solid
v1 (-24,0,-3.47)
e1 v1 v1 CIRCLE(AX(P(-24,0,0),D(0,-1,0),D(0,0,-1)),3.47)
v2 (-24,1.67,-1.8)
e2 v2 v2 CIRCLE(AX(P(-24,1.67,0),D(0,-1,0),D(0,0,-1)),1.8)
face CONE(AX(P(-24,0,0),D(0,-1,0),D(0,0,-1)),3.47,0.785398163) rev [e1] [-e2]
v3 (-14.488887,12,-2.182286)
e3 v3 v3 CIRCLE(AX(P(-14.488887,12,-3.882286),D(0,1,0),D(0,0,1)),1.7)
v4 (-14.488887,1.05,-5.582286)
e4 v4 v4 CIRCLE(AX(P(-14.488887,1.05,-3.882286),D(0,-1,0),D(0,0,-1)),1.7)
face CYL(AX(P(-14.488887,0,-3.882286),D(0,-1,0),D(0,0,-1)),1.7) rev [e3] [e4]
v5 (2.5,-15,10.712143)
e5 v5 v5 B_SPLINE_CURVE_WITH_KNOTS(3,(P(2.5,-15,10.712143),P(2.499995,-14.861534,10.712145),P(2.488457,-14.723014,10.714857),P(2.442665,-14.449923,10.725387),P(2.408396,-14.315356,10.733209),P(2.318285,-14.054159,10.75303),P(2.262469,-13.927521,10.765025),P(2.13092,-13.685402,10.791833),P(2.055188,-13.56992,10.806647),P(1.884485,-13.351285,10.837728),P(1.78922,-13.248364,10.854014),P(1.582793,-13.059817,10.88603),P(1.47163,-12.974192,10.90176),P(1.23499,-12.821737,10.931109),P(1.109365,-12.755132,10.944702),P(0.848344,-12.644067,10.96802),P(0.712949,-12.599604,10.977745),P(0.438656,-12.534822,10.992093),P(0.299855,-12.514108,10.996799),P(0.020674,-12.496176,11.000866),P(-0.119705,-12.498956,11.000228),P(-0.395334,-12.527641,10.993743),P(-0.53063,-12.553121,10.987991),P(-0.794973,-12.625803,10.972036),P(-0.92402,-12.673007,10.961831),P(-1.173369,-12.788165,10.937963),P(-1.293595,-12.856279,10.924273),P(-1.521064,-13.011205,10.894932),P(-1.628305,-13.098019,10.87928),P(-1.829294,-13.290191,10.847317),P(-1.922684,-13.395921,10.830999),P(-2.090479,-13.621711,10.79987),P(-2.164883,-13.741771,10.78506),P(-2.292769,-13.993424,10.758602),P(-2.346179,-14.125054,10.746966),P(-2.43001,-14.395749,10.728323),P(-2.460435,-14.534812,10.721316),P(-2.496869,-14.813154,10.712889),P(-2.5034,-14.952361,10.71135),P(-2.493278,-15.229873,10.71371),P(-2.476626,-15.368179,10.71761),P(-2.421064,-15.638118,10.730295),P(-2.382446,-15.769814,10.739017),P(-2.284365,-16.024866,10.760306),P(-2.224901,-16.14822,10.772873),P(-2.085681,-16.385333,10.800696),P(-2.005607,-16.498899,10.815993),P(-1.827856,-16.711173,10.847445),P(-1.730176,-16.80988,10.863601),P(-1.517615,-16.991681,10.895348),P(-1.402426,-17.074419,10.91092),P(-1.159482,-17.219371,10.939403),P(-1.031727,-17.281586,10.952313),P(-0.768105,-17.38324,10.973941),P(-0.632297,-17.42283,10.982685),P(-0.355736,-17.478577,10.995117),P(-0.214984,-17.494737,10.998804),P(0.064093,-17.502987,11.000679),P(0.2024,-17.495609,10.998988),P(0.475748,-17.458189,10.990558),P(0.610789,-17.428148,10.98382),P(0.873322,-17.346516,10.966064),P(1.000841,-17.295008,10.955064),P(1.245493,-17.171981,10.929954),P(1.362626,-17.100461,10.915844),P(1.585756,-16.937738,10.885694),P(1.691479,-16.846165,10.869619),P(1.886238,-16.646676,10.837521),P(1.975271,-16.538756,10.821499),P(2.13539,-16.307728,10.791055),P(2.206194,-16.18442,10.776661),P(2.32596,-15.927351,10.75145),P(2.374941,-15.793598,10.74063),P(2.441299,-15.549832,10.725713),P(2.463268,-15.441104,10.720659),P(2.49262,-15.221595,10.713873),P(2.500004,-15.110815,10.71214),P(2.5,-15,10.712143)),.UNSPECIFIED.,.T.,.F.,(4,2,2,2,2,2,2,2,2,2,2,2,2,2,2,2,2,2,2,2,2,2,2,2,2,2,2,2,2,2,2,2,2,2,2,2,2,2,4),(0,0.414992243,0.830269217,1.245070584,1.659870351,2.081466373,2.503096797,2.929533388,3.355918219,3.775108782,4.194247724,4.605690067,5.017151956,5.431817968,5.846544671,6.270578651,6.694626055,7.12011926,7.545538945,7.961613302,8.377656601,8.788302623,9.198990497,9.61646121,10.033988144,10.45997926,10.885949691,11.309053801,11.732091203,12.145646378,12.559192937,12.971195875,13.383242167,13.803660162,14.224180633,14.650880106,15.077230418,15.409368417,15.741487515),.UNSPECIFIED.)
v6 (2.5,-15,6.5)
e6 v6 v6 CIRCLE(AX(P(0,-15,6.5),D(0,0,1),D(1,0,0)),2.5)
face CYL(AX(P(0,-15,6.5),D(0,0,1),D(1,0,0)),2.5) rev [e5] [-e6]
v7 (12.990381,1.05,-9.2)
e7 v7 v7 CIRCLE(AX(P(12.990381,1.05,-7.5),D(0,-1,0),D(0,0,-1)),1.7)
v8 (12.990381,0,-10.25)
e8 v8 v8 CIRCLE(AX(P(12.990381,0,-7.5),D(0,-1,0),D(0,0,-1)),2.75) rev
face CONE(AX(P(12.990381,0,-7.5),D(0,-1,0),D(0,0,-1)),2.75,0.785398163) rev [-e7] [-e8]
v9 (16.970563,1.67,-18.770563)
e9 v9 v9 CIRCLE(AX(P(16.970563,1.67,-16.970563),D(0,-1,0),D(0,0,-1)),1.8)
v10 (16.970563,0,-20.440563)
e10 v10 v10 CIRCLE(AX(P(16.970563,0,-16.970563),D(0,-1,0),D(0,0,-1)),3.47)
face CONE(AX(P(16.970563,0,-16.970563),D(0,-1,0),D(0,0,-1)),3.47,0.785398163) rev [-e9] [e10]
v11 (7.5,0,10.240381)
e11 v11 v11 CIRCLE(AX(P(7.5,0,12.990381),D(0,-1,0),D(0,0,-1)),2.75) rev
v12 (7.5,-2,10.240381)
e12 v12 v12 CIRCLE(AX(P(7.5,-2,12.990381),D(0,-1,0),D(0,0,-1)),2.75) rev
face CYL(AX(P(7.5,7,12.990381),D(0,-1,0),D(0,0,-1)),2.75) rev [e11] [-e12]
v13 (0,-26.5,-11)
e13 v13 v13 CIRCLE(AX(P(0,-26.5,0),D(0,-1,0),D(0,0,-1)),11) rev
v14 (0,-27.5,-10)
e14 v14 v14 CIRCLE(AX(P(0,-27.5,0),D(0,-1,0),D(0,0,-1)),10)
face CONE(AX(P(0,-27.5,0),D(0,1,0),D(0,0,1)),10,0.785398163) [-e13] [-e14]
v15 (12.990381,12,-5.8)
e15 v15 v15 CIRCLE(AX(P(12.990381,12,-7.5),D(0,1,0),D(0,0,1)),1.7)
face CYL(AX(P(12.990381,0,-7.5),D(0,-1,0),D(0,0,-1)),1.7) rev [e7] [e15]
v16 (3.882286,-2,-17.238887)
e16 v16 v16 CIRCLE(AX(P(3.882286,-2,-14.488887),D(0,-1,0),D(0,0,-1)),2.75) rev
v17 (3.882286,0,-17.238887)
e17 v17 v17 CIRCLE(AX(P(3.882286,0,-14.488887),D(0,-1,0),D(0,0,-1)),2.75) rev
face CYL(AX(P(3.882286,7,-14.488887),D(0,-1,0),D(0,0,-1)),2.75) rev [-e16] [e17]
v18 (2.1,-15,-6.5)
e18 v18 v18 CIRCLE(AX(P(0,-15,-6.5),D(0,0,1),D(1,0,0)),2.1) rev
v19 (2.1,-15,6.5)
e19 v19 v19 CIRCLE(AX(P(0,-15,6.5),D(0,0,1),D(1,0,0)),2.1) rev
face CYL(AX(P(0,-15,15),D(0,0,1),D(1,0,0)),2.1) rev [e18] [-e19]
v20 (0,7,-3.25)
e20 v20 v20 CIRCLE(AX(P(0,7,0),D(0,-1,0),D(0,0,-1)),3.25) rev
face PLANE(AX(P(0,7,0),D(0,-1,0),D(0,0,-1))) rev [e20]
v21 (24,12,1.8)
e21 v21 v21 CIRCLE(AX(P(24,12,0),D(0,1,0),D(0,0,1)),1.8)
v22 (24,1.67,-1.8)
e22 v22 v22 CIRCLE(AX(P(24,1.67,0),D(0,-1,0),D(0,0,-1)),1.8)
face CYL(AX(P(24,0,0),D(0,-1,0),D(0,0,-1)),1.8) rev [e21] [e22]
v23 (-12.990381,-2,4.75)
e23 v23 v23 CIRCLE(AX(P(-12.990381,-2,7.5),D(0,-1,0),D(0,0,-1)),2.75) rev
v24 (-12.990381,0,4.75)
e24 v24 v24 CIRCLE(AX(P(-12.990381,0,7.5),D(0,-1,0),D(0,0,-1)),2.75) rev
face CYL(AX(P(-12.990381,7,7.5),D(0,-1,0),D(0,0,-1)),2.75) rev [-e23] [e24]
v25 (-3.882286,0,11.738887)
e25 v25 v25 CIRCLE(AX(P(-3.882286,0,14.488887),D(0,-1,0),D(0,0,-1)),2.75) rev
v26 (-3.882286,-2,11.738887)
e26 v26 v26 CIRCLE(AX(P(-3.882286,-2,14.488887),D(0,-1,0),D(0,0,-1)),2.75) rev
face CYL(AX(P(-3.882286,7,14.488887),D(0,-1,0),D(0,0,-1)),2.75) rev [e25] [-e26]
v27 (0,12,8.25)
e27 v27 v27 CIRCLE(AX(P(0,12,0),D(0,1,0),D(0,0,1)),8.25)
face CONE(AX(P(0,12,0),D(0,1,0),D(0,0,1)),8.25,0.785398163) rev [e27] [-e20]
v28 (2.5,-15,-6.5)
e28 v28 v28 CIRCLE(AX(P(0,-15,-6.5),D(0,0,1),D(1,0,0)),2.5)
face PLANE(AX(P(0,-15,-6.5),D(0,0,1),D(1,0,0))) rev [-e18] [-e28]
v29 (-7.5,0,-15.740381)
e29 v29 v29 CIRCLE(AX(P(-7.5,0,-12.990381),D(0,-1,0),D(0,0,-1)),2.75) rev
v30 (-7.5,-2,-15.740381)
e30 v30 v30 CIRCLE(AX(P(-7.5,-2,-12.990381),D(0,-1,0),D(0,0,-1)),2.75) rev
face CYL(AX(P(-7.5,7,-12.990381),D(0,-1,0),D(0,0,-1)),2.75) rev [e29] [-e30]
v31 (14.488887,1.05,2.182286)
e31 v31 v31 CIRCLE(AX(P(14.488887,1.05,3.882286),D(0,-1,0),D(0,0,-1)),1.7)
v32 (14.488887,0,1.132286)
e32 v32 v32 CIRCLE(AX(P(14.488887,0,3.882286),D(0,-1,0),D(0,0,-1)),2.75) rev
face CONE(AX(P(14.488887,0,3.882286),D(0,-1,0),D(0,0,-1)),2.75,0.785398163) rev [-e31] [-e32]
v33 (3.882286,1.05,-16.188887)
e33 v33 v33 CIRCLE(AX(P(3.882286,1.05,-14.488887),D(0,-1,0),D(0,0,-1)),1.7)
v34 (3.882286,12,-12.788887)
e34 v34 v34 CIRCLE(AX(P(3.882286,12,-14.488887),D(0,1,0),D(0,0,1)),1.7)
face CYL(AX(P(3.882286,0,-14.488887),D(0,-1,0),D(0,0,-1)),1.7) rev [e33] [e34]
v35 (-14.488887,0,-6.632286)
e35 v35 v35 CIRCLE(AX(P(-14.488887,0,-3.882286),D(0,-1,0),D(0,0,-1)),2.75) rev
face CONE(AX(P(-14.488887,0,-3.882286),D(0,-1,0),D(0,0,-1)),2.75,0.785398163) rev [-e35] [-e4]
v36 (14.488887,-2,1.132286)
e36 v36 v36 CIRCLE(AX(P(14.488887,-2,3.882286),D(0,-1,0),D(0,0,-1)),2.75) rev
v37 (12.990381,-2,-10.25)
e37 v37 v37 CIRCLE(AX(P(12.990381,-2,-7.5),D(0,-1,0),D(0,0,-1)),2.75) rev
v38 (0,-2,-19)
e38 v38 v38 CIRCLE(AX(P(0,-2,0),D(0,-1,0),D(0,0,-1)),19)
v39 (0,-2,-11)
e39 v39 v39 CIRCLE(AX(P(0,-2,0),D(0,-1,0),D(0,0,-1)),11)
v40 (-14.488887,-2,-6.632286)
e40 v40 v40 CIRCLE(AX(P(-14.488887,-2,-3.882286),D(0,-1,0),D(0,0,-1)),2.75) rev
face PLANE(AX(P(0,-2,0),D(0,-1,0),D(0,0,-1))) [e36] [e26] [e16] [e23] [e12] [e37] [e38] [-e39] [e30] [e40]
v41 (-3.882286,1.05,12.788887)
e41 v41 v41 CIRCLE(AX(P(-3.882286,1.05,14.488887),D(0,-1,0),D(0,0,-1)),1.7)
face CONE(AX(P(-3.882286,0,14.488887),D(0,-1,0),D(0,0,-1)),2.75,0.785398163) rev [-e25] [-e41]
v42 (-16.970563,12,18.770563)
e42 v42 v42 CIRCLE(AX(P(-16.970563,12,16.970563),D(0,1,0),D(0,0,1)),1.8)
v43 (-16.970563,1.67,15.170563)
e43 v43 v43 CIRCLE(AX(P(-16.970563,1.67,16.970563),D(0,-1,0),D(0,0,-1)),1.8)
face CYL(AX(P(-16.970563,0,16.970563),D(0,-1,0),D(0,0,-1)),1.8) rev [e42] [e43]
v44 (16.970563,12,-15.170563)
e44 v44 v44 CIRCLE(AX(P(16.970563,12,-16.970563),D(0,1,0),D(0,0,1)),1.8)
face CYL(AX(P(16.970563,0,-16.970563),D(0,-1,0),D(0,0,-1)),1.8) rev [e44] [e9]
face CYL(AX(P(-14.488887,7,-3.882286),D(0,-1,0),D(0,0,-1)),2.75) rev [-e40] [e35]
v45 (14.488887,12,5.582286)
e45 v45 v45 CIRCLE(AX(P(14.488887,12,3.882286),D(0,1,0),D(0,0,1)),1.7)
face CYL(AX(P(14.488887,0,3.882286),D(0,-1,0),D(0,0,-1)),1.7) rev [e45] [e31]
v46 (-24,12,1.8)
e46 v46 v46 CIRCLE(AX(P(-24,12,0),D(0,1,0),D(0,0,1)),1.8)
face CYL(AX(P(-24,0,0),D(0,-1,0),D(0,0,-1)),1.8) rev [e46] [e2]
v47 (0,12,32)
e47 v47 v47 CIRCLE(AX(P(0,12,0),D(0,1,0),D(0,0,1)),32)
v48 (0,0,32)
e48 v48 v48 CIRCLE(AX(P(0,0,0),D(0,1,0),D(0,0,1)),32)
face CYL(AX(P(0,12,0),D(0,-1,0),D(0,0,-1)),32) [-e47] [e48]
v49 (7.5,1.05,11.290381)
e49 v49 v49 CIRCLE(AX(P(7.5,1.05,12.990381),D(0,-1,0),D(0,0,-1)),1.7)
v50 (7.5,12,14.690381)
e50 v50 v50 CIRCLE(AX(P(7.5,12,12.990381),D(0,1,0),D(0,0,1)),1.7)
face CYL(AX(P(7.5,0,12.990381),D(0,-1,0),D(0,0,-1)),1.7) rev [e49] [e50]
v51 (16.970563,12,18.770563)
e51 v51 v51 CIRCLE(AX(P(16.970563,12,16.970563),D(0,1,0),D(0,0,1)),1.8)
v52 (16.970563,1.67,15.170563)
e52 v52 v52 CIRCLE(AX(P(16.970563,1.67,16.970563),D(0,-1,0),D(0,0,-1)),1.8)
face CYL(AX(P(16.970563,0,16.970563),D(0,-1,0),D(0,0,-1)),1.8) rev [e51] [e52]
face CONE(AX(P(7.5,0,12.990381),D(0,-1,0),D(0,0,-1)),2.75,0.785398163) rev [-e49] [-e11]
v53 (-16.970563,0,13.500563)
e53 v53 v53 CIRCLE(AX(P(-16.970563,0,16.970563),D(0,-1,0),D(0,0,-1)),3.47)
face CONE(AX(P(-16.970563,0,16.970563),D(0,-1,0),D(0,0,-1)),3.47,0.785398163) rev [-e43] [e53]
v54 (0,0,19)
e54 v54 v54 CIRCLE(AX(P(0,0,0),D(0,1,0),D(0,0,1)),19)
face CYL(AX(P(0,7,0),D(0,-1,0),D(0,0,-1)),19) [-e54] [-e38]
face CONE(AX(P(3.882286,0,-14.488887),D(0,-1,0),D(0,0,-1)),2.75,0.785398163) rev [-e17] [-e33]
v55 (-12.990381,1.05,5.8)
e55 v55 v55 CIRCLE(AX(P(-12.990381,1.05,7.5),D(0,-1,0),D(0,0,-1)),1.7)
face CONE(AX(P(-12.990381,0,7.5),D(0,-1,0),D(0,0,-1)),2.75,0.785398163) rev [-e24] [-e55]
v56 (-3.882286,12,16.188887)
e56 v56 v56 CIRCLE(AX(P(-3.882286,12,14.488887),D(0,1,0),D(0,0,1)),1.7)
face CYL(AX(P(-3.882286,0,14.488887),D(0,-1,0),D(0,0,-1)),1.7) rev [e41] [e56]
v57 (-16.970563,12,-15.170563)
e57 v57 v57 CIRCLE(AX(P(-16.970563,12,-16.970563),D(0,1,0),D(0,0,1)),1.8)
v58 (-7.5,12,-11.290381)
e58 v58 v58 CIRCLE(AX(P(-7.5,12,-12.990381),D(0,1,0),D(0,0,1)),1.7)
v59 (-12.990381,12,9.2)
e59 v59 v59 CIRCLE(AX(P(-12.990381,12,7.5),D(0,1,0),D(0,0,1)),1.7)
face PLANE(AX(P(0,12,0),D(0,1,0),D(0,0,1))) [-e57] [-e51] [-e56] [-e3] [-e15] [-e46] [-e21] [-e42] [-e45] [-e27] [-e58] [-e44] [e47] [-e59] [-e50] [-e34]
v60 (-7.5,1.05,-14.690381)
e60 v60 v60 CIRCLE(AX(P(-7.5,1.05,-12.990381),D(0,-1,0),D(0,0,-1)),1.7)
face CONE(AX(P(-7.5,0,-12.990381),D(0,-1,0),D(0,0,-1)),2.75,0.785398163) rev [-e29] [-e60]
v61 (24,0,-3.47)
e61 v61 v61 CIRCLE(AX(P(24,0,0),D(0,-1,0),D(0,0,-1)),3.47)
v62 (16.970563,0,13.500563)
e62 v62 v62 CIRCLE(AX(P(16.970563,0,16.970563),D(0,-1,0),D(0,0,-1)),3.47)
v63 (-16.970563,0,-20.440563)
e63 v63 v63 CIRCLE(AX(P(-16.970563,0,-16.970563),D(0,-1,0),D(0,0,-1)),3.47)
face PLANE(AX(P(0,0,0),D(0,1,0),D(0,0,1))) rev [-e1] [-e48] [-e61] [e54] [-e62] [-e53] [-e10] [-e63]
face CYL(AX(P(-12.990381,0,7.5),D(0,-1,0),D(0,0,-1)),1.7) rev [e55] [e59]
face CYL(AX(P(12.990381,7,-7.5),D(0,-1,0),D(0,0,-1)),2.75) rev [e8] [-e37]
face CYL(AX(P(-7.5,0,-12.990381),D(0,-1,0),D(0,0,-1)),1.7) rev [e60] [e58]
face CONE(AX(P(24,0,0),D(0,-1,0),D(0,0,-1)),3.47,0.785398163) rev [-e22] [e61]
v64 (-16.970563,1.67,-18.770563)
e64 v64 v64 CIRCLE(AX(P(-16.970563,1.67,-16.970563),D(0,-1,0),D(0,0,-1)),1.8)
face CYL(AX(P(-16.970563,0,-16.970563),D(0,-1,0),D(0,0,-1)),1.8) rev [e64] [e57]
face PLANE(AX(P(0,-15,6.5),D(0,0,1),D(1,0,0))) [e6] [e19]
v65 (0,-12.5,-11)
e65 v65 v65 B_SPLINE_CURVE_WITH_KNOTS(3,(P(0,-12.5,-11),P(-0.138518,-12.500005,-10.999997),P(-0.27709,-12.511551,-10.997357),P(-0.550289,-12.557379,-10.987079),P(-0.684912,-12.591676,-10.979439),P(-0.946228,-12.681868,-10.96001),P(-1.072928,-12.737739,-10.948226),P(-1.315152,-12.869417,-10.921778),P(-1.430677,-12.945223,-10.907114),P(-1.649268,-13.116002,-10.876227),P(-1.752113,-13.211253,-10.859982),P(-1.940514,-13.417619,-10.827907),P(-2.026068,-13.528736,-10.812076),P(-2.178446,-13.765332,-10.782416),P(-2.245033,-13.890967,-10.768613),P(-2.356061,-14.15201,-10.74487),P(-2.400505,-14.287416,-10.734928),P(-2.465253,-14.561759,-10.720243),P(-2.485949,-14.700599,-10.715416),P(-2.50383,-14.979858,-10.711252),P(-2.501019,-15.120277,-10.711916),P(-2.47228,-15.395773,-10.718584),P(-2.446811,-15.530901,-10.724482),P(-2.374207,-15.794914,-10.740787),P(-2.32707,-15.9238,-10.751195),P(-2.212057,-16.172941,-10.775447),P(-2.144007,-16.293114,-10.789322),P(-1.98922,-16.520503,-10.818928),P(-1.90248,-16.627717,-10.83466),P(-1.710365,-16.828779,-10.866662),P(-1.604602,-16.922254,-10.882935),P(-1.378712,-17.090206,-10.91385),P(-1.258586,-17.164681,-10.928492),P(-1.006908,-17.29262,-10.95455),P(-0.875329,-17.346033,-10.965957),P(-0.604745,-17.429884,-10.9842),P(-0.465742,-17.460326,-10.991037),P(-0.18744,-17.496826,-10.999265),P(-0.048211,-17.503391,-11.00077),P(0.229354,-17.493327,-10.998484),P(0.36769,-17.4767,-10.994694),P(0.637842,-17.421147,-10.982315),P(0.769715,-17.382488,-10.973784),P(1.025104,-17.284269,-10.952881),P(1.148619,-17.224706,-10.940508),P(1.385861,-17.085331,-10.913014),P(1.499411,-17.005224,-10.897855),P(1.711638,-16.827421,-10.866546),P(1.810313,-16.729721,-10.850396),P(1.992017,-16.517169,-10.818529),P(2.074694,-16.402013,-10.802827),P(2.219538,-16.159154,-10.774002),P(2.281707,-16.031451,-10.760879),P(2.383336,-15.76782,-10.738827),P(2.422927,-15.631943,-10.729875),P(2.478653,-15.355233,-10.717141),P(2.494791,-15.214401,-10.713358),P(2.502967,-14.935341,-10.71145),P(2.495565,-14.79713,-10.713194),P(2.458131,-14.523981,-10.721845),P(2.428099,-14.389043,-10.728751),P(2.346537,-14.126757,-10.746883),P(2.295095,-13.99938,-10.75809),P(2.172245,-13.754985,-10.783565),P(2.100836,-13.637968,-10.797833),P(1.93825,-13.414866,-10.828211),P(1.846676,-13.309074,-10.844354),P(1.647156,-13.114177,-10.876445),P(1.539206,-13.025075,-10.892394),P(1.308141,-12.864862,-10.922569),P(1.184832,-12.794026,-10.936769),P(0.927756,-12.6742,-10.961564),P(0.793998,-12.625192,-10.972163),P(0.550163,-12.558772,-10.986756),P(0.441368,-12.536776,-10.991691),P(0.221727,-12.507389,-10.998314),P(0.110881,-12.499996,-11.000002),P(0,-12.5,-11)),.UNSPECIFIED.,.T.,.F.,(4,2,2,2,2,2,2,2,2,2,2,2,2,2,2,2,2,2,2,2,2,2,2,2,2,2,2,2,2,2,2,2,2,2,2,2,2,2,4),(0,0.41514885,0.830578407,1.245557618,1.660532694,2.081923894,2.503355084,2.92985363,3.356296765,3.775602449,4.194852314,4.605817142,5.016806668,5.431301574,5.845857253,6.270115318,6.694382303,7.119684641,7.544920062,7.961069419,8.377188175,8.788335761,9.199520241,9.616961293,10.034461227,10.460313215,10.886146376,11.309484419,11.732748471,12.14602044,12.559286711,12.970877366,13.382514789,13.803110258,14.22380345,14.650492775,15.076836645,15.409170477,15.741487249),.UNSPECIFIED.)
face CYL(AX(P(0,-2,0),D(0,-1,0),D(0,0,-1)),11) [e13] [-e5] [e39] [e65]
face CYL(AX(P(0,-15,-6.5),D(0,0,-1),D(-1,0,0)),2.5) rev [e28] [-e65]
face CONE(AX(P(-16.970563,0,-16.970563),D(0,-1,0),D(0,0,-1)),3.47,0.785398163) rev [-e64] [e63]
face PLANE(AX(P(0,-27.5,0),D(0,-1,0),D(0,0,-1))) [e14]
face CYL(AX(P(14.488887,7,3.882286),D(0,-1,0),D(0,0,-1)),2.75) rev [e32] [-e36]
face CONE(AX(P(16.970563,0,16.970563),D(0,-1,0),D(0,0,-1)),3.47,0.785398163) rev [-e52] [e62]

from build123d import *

# Parameters (mm, degrees)
SKETCH1_R                                            = 32
SKETCH1_R_2                                          = 8.25
BOSS_EXTRUDE1_DEPTH                                  = 12
CSK_FOR_M3_HEX_SOCKET_COUNTERSUNK_HEAD_S_D           = 3.4
CSK_FOR_M3_HEX_SOCKET_COUNTERSUNK_HEAD_S_CSINK_D     = 5.5
CSK_FOR_M3_HEX_SOCKET_COUNTERSUNK_HEAD_S_CSINK_ANGLE = 90
CSK_FOR_M3_HEX_SOCKET_COUNTERSUNK_HE_2_D             = 3.6
CSK_FOR_M3_HEX_SOCKET_COUNTERSUNK_HE_2_CSINK_D       = 6.94
CSK_FOR_M3_HEX_SOCKET_COUNTERSUNK_HE_2_CSINK_ANGLE   = 90
BOSS_EXTRUDE2_DEPTH                                  = 27.5
BOSS_EXTRUDE2_DEPTH_BACK                             = 7
SKETCH10_R                                           = 19
SKETCH10_R_2                                         = 2.75
CUT_EXTRUDE2_START                                   = -25.5
SKETCH11_R                                           = 19
SKETCH11_R_2                                         = 11
CUT_EXTRUDE2_DEPTH                                   = 25.5
CHAMFER1_SIZE                                        = 5
CHAMFER2_SIZE                                        = 1
F_4_2_4_2_DIAMETER_HOLE1_D                           = 4.2
SKETCH27_R                                           = 2.5
CUT_EXTRUDE3_DEPTH                                   = 8.5
CUT_EXTRUDE4_START                                   = 8.5
SKETCH28_R                                           = 2.5
CUT_EXTRUDE4_DEPTH                                   = 8.5


with BuildPart() as part:
    # Sketch1 → Boss-Extrude1 (new body)
    with BuildSketch(Plane(origin=(0, 0, 0), x_dir=(1, 0, 0), z_dir=(0, 1, 0))):
        with Locations(Location((0, 0, 0), (0, 0, 270))):
            Circle(SKETCH1_R)
        with Locations(Location((0, 0, 0), (0, 0, 270))):
            Circle(SKETCH1_R_2, mode=Mode.SUBTRACT)
    extrude(amount=BOSS_EXTRUDE1_DEPTH)

    # CSK for M3 Hex Socket Countersunk Head S (through all)
    with Locations(Plane.XZ):
        with Locations((3.882285677, -14.488887394), (12.990381057, -7.5), (14.488887394, 3.882285677), (7.5, 12.990381057), (-3.882285677, 14.488887394), (-12.990381057, 7.5), (-14.488887394, -3.882285677), (-7.5, -12.990381057)):
            CounterSinkHole(CSK_FOR_M3_HEX_SOCKET_COUNTERSUNK_HEAD_S_D / 2, CSK_FOR_M3_HEX_SOCKET_COUNTERSUNK_HEAD_S_CSINK_D / 2, counter_sink_angle=CSK_FOR_M3_HEX_SOCKET_COUNTERSUNK_HEAD_S_CSINK_ANGLE)

    # CSK for M3 Hex Socket Countersunk He 2 (through all)
    with Locations(Plane(origin=(0, 0, 0), x_dir=(-1, 0, 0), z_dir=(0, -1, 0))):
        with Locations((-16.970562748, -16.970562748), (-24, 0), (-16.970562748, 16.970562748), (16.970562748, 16.970562748), (24, 0), (16.970562748, -16.970562748)):
            CounterSinkHole(CSK_FOR_M3_HEX_SOCKET_COUNTERSUNK_HE_2_D / 2, CSK_FOR_M3_HEX_SOCKET_COUNTERSUNK_HE_2_CSINK_D / 2, counter_sink_angle=CSK_FOR_M3_HEX_SOCKET_COUNTERSUNK_HE_2_CSINK_ANGLE)

    # Sketch10 → Boss-Extrude2 (add, two sides: drawn at the far end of the back side and taken through both)
    with BuildSketch(Plane.XZ.offset(-BOSS_EXTRUDE2_DEPTH_BACK)):
        with Locations(Location((0, 0, 0), (0, 0, 270))):
            Circle(SKETCH10_R)
        with Locations(Location((7.5, 12.990381057, 0), (0, 0, 270))):
            Circle(SKETCH10_R_2, mode=Mode.SUBTRACT)
        with Locations(Location((14.488887394, 3.882285677, 0), (0, 0, 270))):
            Circle(SKETCH10_R_2, mode=Mode.SUBTRACT)
        with Locations(Location((12.990381057, -7.5, 0), (0, 0, 270))):
            Circle(SKETCH10_R_2, mode=Mode.SUBTRACT)
        with Locations(Location((3.882285677, -14.488887394, 0), (0, 0, 270))):
            Circle(SKETCH10_R_2, mode=Mode.SUBTRACT)
        with Locations(Location((-7.5, -12.990381057, 0), (0, 0, 270))):
            Circle(SKETCH10_R_2, mode=Mode.SUBTRACT)
        with Locations(Location((-14.488887394, -3.882285677, 0), (0, 0, 270))):
            Circle(SKETCH10_R_2, mode=Mode.SUBTRACT)
        with Locations(Location((-12.990381057, 7.5, 0), (0, 0, 270))):
            Circle(SKETCH10_R_2, mode=Mode.SUBTRACT)
        with Locations(Location((-3.882285677, 14.488887394, 0), (0, 0, 270))):
            Circle(SKETCH10_R_2, mode=Mode.SUBTRACT)
    extrude(amount=BOSS_EXTRUDE2_DEPTH + BOSS_EXTRUDE2_DEPTH_BACK)

    # Sketch11 → Cut-Extrude2 (cut)
    with BuildSketch(Plane.XZ.offset(27.5).offset(CUT_EXTRUDE2_START)):
        with Locations(Location((0, 0, 0), (0, 0, 270))):
            Circle(SKETCH11_R)
        with Locations(Location((0, 0, 0), (0, 0, 270))):
            Circle(SKETCH11_R_2, mode=Mode.SUBTRACT)
    extrude(amount=CUT_EXTRUDE2_DEPTH, mode=Mode.SUBTRACT)

    # Chamfer1
    chamfer1_edges = [part.edges().sort_by_distance(p)[0] for p in [
        (0, 7, -8.25),
    ]]
    chamfer(chamfer1_edges, length=CHAMFER1_SIZE - 0.0001)  # a hair under: the kernel refuses the full size

    # Chamfer2
    chamfer2_edges = [part.edges().sort_by_distance(p)[0] for p in [
        (0, -27.5, 11),
    ]]
    chamfer(chamfer2_edges, length=CHAMFER2_SIZE)

    # Ø4.2 (4.2) Diameter Hole1 (through all)
    with Locations(Plane.XY.offset(15)):
        with Locations((0, -15)):
            Hole(F_4_2_4_2_DIAMETER_HOLE1_D / 2)

    # Sketch27 → Cut-Extrude3 (cut)
    with BuildSketch(Plane.XY.offset(15)):
        with Locations((0, -15)):
            Circle(SKETCH27_R)
    extrude(amount=-CUT_EXTRUDE3_DEPTH, mode=Mode.SUBTRACT)

    # Sketch28 → Cut-Extrude4 (cut)
    with BuildSketch(Plane.XY.offset(-15).offset(CUT_EXTRUDE4_START)):
        with Locations((0, -15)):
            Circle(SKETCH28_R)
    extrude(amount=-CUT_EXTRUDE4_DEPTH, mode=Mode.SUBTRACT)


solid = part.part
